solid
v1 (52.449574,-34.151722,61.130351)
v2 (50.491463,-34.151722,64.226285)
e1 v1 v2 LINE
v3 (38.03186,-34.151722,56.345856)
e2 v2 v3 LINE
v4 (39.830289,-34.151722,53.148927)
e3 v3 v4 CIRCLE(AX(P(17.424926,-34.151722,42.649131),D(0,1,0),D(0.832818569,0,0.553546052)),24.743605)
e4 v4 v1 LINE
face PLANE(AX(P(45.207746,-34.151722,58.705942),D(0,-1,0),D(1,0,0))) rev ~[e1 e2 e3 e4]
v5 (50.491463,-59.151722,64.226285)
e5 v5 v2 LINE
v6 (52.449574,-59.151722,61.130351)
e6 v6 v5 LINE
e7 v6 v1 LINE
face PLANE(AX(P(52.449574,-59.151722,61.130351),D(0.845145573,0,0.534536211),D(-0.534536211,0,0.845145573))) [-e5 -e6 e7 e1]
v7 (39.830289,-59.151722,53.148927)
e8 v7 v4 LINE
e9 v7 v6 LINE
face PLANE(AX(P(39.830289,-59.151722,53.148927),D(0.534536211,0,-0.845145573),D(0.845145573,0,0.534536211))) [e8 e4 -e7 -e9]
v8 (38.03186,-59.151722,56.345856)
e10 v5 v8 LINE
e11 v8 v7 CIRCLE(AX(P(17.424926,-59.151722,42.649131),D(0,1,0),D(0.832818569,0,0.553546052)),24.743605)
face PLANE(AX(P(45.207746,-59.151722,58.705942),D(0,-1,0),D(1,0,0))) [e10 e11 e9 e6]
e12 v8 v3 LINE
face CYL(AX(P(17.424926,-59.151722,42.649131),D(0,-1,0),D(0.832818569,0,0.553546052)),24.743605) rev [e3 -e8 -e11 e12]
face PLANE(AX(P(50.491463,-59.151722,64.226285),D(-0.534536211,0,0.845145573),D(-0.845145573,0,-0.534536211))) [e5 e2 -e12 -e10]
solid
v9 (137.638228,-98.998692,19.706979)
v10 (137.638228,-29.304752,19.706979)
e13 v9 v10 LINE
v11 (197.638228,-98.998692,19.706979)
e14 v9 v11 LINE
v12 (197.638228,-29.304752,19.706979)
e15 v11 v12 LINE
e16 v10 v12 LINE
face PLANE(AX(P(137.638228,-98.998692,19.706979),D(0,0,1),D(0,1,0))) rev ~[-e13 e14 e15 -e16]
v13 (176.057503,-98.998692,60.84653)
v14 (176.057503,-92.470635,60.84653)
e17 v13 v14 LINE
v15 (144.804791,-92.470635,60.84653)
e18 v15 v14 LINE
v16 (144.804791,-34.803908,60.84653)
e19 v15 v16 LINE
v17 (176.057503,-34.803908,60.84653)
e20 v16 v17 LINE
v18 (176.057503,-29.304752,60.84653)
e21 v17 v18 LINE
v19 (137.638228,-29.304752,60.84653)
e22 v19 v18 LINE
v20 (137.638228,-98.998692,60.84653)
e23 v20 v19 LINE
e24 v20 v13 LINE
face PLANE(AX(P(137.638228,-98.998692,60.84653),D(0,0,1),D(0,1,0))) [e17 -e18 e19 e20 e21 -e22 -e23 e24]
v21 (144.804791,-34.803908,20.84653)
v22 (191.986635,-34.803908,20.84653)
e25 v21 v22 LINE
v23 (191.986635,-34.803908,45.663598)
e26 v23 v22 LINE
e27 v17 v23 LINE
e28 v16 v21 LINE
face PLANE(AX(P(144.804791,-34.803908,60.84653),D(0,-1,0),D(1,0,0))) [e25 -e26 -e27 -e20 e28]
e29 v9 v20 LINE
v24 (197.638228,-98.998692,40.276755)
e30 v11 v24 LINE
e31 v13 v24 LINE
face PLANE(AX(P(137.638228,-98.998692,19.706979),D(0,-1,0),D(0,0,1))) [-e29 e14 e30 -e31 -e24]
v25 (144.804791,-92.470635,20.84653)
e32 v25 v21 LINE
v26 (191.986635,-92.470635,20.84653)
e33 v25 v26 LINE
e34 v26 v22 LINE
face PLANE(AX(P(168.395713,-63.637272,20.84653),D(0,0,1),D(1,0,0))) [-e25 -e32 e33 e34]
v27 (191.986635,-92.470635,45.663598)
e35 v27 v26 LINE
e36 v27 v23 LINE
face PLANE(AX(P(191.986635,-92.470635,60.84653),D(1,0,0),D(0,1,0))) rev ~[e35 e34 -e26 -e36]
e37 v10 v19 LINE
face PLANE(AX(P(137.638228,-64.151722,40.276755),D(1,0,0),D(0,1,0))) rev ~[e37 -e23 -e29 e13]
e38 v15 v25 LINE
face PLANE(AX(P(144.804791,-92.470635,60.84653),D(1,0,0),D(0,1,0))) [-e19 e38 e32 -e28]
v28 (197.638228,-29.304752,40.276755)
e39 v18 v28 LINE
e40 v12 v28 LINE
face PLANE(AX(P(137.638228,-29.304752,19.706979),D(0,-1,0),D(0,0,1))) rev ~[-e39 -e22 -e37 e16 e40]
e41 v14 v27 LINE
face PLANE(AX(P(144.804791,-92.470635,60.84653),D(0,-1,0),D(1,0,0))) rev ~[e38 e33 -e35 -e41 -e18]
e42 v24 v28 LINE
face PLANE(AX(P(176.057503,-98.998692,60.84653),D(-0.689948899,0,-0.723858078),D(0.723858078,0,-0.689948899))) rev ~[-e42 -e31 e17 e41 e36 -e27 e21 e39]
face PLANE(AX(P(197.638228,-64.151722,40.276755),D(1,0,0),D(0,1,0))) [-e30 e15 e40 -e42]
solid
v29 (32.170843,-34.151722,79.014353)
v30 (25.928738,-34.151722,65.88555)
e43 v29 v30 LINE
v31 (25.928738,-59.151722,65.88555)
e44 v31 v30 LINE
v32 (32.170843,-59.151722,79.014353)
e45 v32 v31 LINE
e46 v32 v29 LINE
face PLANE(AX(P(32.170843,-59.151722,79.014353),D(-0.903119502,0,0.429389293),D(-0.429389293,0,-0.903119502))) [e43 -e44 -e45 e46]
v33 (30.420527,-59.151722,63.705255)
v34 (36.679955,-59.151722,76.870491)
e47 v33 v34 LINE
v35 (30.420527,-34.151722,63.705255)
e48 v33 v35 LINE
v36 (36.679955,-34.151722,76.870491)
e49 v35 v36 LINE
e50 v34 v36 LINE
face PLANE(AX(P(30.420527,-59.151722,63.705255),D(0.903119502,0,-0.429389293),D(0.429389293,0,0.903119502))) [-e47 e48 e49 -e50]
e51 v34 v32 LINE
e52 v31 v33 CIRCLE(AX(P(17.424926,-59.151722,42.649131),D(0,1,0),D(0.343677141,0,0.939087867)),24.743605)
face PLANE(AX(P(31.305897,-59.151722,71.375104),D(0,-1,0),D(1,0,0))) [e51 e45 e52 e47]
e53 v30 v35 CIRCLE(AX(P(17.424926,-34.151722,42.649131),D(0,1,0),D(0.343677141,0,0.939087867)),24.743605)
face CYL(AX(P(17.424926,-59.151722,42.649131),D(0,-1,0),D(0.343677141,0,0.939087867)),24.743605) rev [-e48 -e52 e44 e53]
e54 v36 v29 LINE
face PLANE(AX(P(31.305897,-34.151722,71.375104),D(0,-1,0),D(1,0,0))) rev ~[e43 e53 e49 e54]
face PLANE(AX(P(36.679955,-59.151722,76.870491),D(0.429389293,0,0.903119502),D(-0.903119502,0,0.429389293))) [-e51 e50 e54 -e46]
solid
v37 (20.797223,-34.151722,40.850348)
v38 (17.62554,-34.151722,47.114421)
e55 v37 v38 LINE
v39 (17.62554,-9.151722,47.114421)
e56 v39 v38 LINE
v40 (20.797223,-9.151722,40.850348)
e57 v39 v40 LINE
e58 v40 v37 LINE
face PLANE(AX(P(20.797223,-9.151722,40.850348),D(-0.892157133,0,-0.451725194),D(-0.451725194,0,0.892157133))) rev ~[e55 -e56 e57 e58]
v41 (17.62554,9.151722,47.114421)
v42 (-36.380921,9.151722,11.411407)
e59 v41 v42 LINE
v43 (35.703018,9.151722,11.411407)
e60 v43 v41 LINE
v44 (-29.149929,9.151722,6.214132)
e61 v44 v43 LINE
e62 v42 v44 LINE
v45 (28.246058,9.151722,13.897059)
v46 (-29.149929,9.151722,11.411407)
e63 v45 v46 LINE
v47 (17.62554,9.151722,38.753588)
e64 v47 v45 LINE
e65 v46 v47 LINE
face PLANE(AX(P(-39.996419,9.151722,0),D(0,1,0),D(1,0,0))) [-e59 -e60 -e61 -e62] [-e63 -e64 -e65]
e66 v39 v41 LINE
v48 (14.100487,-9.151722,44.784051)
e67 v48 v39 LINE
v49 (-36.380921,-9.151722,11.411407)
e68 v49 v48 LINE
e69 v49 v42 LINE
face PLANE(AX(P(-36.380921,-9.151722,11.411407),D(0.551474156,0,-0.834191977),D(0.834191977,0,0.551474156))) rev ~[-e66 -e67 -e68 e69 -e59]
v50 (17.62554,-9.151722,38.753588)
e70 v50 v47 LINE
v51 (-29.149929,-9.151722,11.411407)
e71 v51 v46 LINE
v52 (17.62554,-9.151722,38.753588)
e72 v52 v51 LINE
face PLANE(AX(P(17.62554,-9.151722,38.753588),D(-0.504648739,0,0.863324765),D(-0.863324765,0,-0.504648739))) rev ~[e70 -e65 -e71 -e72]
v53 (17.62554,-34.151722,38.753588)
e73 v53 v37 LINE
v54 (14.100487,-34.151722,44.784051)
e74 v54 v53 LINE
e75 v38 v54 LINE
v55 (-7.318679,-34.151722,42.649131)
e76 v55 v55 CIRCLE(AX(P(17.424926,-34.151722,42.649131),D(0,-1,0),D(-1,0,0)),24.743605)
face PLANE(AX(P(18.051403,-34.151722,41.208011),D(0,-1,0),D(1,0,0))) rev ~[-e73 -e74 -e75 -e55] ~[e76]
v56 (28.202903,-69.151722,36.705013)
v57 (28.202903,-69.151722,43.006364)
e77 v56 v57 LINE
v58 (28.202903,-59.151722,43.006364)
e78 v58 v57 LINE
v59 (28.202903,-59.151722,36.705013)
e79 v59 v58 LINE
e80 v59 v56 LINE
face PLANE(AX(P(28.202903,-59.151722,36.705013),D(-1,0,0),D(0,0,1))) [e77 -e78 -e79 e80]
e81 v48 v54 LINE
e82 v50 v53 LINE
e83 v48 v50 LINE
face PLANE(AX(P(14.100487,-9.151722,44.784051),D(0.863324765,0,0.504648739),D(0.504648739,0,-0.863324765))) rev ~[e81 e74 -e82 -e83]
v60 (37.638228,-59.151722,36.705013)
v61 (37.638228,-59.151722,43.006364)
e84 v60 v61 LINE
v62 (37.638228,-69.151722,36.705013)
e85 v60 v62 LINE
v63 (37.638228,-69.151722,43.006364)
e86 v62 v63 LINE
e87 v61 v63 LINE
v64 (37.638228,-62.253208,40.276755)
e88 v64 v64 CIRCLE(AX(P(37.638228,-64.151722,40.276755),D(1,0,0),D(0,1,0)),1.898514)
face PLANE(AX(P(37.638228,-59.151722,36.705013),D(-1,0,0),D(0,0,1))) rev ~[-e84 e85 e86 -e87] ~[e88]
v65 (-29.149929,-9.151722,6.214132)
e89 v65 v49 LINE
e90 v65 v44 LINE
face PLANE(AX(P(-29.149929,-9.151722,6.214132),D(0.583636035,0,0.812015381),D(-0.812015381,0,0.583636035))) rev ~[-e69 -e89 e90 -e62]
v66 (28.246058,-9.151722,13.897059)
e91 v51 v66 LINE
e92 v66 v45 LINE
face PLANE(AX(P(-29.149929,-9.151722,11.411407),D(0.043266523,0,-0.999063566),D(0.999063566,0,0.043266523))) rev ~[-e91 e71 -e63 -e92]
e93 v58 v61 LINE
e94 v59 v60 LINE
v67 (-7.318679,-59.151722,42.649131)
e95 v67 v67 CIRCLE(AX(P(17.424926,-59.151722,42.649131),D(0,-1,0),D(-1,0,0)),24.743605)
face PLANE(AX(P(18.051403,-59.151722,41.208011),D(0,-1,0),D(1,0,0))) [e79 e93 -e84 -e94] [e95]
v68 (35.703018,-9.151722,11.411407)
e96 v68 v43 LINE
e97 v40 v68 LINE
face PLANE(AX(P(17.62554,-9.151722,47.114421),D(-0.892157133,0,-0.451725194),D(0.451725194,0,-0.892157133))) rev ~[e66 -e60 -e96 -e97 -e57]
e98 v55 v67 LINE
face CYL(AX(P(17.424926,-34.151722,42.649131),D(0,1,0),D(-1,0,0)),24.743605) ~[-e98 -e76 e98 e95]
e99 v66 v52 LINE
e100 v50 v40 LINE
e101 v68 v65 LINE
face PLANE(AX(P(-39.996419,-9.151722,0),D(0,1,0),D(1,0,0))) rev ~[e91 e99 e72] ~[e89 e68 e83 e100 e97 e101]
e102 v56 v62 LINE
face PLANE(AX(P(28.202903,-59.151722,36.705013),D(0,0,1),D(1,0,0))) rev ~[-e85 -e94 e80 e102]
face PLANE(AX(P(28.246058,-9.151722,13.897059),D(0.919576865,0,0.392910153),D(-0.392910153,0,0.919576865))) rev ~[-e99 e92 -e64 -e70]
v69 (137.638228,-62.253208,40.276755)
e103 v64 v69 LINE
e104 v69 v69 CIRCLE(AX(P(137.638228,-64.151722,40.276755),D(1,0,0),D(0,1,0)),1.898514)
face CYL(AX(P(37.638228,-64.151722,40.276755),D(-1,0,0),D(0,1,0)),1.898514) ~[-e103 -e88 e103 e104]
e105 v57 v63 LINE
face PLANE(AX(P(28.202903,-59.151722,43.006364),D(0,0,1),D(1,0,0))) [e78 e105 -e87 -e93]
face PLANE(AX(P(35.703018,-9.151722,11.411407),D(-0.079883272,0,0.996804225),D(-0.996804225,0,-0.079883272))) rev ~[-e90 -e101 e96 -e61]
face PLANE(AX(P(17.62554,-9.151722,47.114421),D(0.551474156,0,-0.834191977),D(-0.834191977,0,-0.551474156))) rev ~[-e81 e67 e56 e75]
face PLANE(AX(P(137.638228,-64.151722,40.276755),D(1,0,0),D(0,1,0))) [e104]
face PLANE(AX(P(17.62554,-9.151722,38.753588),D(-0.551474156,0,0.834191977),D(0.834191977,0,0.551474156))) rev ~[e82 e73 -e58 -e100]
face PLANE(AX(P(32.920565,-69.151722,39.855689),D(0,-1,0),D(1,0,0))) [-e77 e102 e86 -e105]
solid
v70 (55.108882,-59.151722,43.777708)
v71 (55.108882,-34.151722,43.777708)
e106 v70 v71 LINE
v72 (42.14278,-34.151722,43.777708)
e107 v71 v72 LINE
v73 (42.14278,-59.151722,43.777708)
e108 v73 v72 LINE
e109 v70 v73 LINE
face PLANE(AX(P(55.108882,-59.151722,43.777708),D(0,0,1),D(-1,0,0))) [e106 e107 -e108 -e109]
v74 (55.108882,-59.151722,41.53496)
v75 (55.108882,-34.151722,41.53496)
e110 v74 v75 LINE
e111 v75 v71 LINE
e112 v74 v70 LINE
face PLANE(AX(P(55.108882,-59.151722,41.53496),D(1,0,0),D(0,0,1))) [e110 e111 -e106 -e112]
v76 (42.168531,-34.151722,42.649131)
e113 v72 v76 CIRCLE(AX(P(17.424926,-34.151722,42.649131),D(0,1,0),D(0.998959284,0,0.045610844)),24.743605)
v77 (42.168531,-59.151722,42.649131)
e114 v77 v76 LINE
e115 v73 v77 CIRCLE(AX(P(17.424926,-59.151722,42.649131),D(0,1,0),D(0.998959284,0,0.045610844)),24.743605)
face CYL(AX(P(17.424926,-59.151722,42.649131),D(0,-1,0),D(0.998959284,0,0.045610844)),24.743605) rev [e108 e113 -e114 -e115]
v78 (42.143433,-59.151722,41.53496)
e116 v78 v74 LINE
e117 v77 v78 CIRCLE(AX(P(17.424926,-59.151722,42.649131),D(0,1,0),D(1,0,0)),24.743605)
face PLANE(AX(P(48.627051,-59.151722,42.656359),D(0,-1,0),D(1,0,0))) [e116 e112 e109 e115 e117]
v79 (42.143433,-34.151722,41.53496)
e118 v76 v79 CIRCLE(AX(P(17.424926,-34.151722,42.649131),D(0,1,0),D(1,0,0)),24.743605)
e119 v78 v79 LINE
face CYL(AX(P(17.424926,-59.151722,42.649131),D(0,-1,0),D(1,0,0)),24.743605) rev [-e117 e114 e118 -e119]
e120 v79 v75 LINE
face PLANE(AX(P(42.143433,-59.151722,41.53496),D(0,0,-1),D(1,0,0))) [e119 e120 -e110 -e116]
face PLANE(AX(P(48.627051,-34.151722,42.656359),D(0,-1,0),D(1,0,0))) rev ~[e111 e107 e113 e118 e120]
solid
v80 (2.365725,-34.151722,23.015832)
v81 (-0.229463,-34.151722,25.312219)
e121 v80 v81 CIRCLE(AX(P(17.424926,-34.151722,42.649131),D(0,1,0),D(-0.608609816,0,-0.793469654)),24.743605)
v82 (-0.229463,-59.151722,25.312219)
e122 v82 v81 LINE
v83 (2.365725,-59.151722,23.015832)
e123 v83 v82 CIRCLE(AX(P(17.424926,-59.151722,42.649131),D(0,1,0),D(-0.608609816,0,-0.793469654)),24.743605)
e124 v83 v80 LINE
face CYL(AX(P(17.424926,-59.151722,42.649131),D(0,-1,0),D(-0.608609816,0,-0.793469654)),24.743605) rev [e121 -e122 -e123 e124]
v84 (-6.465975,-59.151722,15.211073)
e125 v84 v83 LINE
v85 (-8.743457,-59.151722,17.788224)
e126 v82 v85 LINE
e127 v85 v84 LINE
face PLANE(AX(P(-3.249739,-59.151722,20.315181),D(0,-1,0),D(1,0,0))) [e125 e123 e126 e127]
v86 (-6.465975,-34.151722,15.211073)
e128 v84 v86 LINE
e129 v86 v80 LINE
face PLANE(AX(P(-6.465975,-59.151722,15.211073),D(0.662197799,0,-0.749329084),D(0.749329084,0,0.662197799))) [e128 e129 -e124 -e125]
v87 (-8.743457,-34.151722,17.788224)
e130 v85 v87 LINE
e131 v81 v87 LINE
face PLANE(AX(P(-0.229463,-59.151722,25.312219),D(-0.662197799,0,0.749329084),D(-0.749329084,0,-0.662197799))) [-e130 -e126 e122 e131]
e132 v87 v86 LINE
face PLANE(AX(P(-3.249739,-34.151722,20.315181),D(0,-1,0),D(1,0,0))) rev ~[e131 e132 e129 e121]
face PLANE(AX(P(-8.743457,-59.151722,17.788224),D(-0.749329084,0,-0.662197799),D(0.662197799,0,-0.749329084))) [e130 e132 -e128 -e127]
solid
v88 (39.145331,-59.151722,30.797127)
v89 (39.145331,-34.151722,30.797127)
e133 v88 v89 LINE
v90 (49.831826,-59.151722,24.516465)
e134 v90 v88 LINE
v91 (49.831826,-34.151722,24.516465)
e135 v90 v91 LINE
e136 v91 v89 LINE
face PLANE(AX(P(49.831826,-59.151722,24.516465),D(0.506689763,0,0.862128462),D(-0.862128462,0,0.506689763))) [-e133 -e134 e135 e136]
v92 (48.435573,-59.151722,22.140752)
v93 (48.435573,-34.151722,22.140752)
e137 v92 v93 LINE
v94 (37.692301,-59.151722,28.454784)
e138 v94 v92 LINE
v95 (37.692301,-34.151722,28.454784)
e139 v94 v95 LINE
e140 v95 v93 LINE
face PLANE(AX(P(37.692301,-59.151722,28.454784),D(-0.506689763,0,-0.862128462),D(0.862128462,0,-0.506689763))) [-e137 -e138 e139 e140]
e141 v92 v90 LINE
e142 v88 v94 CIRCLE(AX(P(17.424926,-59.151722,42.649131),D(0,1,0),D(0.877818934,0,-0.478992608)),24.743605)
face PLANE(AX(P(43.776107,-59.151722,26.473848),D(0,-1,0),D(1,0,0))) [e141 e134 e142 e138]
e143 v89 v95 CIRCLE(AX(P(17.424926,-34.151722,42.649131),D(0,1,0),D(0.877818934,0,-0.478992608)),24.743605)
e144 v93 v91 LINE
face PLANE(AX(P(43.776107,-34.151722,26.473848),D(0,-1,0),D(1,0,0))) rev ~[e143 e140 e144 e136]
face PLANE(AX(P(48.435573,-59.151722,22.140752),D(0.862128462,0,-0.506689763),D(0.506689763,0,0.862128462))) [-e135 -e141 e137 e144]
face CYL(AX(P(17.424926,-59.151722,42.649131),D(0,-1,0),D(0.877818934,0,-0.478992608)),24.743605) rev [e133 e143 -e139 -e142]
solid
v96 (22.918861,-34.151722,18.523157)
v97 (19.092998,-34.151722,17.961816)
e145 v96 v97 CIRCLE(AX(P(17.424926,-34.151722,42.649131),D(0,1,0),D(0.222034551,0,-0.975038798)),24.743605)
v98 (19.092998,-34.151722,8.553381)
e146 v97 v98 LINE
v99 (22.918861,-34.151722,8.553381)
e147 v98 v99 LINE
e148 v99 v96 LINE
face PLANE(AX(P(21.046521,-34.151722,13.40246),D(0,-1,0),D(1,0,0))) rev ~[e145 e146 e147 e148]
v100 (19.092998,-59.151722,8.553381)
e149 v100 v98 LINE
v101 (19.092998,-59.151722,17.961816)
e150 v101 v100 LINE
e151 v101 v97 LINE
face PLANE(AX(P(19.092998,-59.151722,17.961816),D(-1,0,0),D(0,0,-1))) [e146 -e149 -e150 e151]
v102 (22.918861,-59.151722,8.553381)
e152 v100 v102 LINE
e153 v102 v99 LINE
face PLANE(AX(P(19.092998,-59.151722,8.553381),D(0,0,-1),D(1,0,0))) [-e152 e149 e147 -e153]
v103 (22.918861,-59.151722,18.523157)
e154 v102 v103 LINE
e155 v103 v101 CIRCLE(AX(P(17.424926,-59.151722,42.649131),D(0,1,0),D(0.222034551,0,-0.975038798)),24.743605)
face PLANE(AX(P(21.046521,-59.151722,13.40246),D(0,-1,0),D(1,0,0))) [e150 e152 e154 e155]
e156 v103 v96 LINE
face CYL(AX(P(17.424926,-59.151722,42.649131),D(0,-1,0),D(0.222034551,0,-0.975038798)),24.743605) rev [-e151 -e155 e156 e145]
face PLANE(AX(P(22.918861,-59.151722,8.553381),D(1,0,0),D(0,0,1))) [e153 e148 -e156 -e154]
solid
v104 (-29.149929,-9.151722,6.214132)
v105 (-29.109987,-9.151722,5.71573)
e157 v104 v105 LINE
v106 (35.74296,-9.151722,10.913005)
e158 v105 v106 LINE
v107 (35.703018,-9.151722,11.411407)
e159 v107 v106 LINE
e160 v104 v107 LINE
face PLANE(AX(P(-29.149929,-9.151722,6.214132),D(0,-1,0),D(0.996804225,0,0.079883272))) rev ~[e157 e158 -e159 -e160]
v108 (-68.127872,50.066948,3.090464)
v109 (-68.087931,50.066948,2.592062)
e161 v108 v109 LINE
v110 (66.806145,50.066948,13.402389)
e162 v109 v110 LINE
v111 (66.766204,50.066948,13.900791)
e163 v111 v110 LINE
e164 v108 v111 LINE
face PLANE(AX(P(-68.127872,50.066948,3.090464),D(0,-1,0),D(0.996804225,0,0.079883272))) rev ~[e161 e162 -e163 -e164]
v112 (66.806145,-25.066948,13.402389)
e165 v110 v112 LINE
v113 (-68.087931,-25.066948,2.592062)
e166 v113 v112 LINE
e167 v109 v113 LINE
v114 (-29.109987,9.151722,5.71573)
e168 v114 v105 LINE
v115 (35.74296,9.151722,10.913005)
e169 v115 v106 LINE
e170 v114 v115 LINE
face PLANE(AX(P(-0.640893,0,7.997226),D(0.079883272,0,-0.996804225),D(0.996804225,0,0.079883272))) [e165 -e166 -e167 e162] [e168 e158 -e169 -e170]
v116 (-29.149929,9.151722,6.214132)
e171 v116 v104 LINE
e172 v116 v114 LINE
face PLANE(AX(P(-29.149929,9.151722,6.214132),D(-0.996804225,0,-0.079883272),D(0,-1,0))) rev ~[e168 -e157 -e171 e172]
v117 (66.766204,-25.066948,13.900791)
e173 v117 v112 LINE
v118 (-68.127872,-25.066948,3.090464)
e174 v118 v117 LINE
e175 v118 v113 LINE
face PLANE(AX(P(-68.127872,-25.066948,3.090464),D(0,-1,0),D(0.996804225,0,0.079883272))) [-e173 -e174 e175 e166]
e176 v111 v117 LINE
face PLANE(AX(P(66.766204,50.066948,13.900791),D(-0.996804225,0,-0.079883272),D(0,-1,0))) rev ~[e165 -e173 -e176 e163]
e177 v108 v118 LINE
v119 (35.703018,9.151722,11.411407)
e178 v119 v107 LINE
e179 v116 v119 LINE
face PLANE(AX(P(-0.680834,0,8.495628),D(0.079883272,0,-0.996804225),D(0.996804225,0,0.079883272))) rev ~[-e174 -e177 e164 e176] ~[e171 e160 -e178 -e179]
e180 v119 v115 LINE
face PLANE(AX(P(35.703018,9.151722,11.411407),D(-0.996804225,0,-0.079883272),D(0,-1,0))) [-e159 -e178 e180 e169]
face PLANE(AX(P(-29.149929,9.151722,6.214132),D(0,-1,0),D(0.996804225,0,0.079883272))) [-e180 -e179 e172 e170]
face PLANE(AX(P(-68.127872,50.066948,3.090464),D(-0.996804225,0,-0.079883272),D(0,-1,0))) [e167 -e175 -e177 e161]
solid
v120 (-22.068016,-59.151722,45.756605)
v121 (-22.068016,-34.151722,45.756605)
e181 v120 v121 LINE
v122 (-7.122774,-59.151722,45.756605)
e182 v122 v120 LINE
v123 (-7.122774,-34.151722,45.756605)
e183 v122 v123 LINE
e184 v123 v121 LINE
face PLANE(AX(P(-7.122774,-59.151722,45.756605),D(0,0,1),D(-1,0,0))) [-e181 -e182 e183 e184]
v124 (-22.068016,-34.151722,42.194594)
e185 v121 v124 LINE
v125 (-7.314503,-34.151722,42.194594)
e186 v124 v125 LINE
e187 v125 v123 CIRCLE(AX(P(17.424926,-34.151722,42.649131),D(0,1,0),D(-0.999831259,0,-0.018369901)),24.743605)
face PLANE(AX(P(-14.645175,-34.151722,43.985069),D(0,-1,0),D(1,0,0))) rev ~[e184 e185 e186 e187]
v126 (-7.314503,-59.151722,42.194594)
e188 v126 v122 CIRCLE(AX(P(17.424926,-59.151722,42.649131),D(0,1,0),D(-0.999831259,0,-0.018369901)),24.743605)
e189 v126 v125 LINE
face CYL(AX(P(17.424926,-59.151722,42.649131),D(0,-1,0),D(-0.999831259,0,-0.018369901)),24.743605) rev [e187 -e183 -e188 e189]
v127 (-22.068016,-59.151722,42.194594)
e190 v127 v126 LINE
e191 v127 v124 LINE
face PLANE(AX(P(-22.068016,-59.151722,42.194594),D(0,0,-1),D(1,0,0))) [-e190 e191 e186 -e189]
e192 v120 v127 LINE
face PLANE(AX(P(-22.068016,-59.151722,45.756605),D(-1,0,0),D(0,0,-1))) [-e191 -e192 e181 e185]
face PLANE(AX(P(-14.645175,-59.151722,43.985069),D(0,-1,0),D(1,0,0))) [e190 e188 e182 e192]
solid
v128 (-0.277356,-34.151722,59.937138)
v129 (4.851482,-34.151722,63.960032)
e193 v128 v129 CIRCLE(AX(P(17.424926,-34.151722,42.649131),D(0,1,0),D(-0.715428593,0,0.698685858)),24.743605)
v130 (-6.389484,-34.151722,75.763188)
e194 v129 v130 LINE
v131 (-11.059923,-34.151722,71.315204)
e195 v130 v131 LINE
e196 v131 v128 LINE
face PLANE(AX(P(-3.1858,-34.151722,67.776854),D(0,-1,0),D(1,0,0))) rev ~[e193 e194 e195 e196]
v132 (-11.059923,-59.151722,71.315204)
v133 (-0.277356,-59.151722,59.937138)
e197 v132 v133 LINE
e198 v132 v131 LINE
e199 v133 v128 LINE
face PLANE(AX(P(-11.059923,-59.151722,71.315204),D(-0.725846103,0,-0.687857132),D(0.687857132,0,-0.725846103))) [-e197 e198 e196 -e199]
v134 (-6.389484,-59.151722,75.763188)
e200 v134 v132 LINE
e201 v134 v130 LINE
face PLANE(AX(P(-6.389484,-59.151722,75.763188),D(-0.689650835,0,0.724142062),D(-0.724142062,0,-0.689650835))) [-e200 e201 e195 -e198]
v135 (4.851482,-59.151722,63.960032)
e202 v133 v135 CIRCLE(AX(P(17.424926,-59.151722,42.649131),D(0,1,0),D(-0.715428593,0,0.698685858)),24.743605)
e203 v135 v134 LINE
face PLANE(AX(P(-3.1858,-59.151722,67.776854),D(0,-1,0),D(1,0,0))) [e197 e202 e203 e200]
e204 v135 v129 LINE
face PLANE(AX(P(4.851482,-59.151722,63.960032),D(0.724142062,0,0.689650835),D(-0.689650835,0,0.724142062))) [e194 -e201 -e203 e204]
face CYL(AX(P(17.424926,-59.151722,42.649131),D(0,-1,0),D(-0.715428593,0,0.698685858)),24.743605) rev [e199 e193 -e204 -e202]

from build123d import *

# Parameters (mm, degrees)
F0_W      = 79.9928382039
F0_H      = 18.303444609
F1_DEPTH  = 50
F2_W      = 79.9928382039
F2_H      = 50
F3_DEPTH  = 18.304444609
F5_DEPTH  = 25
F6_W      = 135.3265494108
F6_H      = 100.133895874
F6_W_2    = 65.060867267
F6_H_2    = 18.303444609
F7_DEPTH  = 0.5
F9_DEPTH  = 25
F11_DEPTH = 25
F13_DEPTH = 25
F14_W     = 9.435325861
F14_H     = 6.3013508916
F15_DEPTH = 10
F16_R     = 1.8985138223
F17_DEPTH = 100
F18_W     = 69.6939403564
F18_H     = 41.1395505071
F18_R     = 1.8985138223
F19_DEPTH = 60
F20_W     = 47.1818447113
F20_H     = 57.6667264104
F21_DEPTH = 40
F23_DEPTH = 149.0666404197


# Not quite as in the source:
# - a feature names something its author has since deleted; it is built from what else it names


with BuildPart() as f1:
    # F0 (on Top) → F1 (new body)
    with BuildSketch(Plane.XY):
        Rectangle(F0_W, F0_H)
    extrude(amount=F1_DEPTH)

    # F2 (on face) → F3 (cut, through all)
    with BuildSketch(Plane.XZ.offset(9.1517223045)):
        with Locations((0, 25)):
            Rectangle(F2_W, F2_H)
        Polygon((35.7030183077, 11.4114070311), (-29.1499290615, 6.2141320668), (-36.3809205592, 11.4114070311), (17.6255404949, 47.1144206822), align=None, mode=Mode.SUBTRACT)
        Polygon((17.6255404949, 38.7535877526), (-29.1499290615, 11.4114070311), (28.2460581511, 13.8970594853), align=None)
    extrude(amount=-F3_DEPTH, mode=Mode.SUBTRACT)

    # F4 (on face) → F5 (join)
    with BuildSketch(Plane.XZ.offset(9.1517223045)):
        Polygon((14.1004873602, 44.7840509869), (17.6255404949, 38.7535877526), (20.7972230716, 40.8503484757), (17.6255404949, 47.1144206822), align=None)
    extrude(amount=F5_DEPTH)

    # F8 (on face) → F9 (join)
    with BuildSketch(Plane.XZ.offset(34.1517223045)):
        Polygon((20.7972230716, 40.8503484757), (19.8864468458, 42.6491312683), (15.3484355118, 42.6491312683), (17.6255404949, 38.7535877526), align=None)
        Polygon((15.3484355118, 42.6491312683), (19.8864468458, 42.6491312683), (17.6255404949, 47.1144206822), (14.1004873602, 44.7840509869), align=None)
        with BuildLine():
            Line((19.8864468458, 42.6491312683), (42.1685310007, 42.6491312683))
            ThreePointArc((42.1685310007, 42.6491312683), (17.4249261618, 67.3927361072), (-7.3186786772, 42.6491312683))
            Line((-7.3186786772, 42.6491312683), (15.3484355118, 42.6491312683))
            Line((15.3484355118, 42.6491312683), (14.1004873602, 44.7840509869))
            Line((14.1004873602, 44.7840509869), (17.6255404949, 47.1144206822))
            Line((17.6255404949, 47.1144206822), (19.8864468458, 42.6491312683))
        make_face()
        with BuildLine():
            ThreePointArc((-7.3186786772, 42.6491312683), (17.4249261618, 17.9055264293), (42.1685310007, 42.6491312683))
            Line((42.1685310007, 42.6491312683), (19.8864468458, 42.6491312683))
            Line((19.8864468458, 42.6491312683), (20.7972230716, 40.8503484757))
            Line((20.7972230716, 40.8503484757), (17.6255404949, 38.7535877526))
            Line((17.6255404949, 38.7535877526), (15.3484355118, 42.6491312683))
            Line((15.3484355118, 42.6491312683), (-7.3186786772, 42.6491312683))
        make_face()
    extrude(amount=F9_DEPTH)

    # F14 (on face) → F15 (join)
    with BuildSketch(Plane.XZ.offset(59.1517223045)):
        with Locations((32.9205654562, 39.8556888103)):
            Rectangle(F14_W, F14_H)
    extrude(amount=F15_DEPTH)

    # F16 (on face) → F17 (join)
    with BuildSketch(Plane.YZ.offset(37.6382283866)):
        with Locations((-64.1517223045, 40.2767546475)):
            Circle(F16_R)
    extrude(amount=F17_DEPTH)


with BuildPart() as f7:
    # F6 (on face) → F7 (new body)
    with BuildSketch(Plane(origin=(-0.6808343292, 0, 8.4956276551), x_dir=(0.9968042249, 0, 0.0798832721), z_dir=(0.0798832721, 0, -0.9968042249))):
        Rectangle(F6_W, F6_H)
        with Locations((3.9700663915, 0)):
            Rectangle(F6_W_2, F6_H_2, mode=Mode.SUBTRACT)
    extrude(amount=F7_DEPTH)

    # F11 (cut): a face of the model
    f11_faces = [f7.faces().sort_by_distance(p)[0] for p in [
        (-0.6608635112, -50.066947937, 8.2464265988),
    ]]
    extrude(f11_faces, amount=-F11_DEPTH, mode=Mode.SUBTRACT)


with BuildPart() as f13:
    # F12 (on face) → F13 (new body)
    with BuildSketch(Plane.XZ.offset(59.1517223045)):
        with BuildLine():
            ThreePointArc((25.9287375384, 65.8855503662), (28.2297677146, 64.9089915428), (30.4205267746, 63.7052549651))
            Line((30.4205267746, 63.7052549651), (36.6799546023, 76.8704908801))
            Line((36.6799546023, 76.8704908801), (32.170843333, 79.0143534541))
            Line((32.170843333, 79.0143534541), (25.9287375384, 65.8855503662))
        make_face()
    extrude(amount=-F13_DEPTH)


with BuildPart() as f13b:
    # F12 (on face) → F13, piece 2 (new body)
    with BuildSketch(Plane.XZ.offset(59.1517223045)):
        with BuildLine():
            ThreePointArc((38.0318597301, 56.345856035), (38.9903960982, 54.7807629329), (39.8302887258, 53.1489269235))
            Line((39.8302887258, 53.1489269235), (52.4495742528, 61.130350821))
            Line((52.4495742528, 61.130350821), (50.491463393, 64.2262846231))
            Line((50.491463393, 64.2262846231), (38.0318597301, 56.345856035))
        make_face()
    extrude(amount=-F13_DEPTH)


with BuildPart() as f13c:
    # F12 (on face) → F13, piece 3 (new body)
    with BuildSketch(Plane.XZ.offset(59.1517223045)):
        with BuildLine():
            Line((49.8318262398, 24.5164651424), (39.1453309961, 30.7971274605))
            ThreePointArc((39.1453309961, 30.7971274605), (38.4514582478, 29.6057065315), (37.6923008836, 28.4547837204))
            Line((37.6923008836, 28.4547837203), (48.4355733395, 22.1407523238))
            Line((48.4355733395, 22.1407523238), (49.8318262398, 24.5164651424))
        make_face()
    extrude(amount=-F13_DEPTH)


with BuildPart() as f13d:
    # F12 (on face) → F13, piece 4 (new body)
    with BuildSketch(Plane.XZ.offset(59.1517223045)):
        with BuildLine():
            ThreePointArc((-7.3145034198, 42.1945936978), (-7.2829121383, 43.9790586964), (-7.122774146, 45.7566045225))
            Line((-7.122774146, 45.7566045225), (-22.0680162311, 45.7566045225))
            Line((-22.0680162311, 45.7566045225), (-22.0680162311, 42.1945936978))
            Line((-22.0680162311, 42.1945936978), (-7.3145034198, 42.1945936978))
        make_face()
    extrude(amount=-F13_DEPTH)


with BuildPart() as f13e:
    # F12 (on face) → F13, piece 5 (new body)
    with BuildSketch(Plane.XZ.offset(59.1517223045)):
        with BuildLine():
            Line((55.1088824868, 43.7777079642), (42.1427799332, 43.7777079642))
            ThreePointArc((42.1427799332, 43.7777079642), (42.1620923961, 43.2135664895), (42.1685310007, 42.6491312683))
            ThreePointArc((42.1685310007, 42.6491312683), (42.1622558216, 42.0919044519), (42.1434334673, 41.5349602699))
            Line((42.1434334673, 41.5349602699), (55.1088824868, 41.5349602699))
            Line((55.1088824868, 41.5349602699), (55.1088824868, 43.7777079642))
        make_face()
    extrude(amount=-F13_DEPTH)


with BuildPart() as f13f:
    # F12 (on face) → F13, piece 6 (new body)
    with BuildSketch(Plane.XZ.offset(59.1517223045)):
        with BuildLine():
            Line((22.9188613594, 8.5533810779), (22.9188613594, 18.5231565425))
            ThreePointArc((22.9188613594, 18.5231565425), (21.0169117184, 18.1676358036), (19.0929975361, 17.961816341))
            Line((19.0929975361, 17.961816341), (19.0929975361, 8.5533810779))
            Line((19.0929975361, 8.5533810779), (22.9188613594, 8.5533810779))
        make_face()
    extrude(amount=-F13_DEPTH)


with BuildPart() as f13g:
    # F12 (on face) → F13, piece 7 (new body)
    with BuildSketch(Plane.XZ.offset(59.1517223045)):
        with BuildLine():
            Line((-6.4659747203, 15.2110734288), (2.3657253742, 23.0158316968))
            ThreePointArc((2.3657253742, 23.0158316968), (1.0278812114, 24.1185377181), (-0.2294625715, 25.3122186573))
            Line((-0.2294625715, 25.3122186573), (-8.7434565648, 17.7882239223))
            Line((-8.7434565648, 17.7882239223), (-6.4659747203, 15.2110734288))
        make_face()
    extrude(amount=-F13_DEPTH)


with BuildPart() as f13h:
    # F12 (on face) → F13, piece 8 (new body)
    with BuildSketch(Plane.XZ.offset(59.1517223045)):
        with BuildLine():
            ThreePointArc((-0.2773562415, 59.9371380401), (2.1540120961, 62.1182135277), (4.8514824982, 63.9600321142))
            Line((4.8514824982, 63.9600321142), (-6.3894838095, 75.7631883025))
            Line((-6.3894838095, 75.7631883025), (-11.0599229864, 71.3152043402))
            Line((-11.0599229864, 71.3152043402), (-0.2773562415, 59.9371380401))
        make_face()
    extrude(amount=-F13_DEPTH)


with BuildPart() as f19:
    # F18 (on face) → F19 (new body)
    with BuildSketch(Plane.YZ.offset(137.6382283866)):
        with Locations((-64.1517223045, 40.2767546475)):
            Rectangle(F18_W, F18_H)
        with Locations((-64.1517223045, 40.2767546475)):
            Circle(F18_R, mode=Mode.SUBTRACT)
        with Locations((-64.1517223045, 40.2767546475)):
            Circle(F18_R)
    extrude(amount=F19_DEPTH)

    # F20 (on face) → F21 (cut)
    with BuildSketch(Plane.XY.offset(60.846529901)):
        with Locations((168.3957129717, -63.6372715235)):
            Rectangle(F20_W, F20_H)
    extrude(amount=-F21_DEPTH, mode=Mode.SUBTRACT)

    # F22 (on face) → F23 (cut, through all)
    with BuildSketch(Plane.XZ.offset(98.9986924827)):
        Polygon((197.6382283866, 60.846529901), (176.0575026274, 60.846529901), (197.6382283866, 40.2767546475), align=None)
    extrude(amount=-F23_DEPTH, mode=Mode.SUBTRACT)


solid = Compound([f1.part, f7.part, f13.part, f13b.part, f13c.part, f13d.part, f13e.part, f13f.part, f13g.part, f13h.part, f19.part])
